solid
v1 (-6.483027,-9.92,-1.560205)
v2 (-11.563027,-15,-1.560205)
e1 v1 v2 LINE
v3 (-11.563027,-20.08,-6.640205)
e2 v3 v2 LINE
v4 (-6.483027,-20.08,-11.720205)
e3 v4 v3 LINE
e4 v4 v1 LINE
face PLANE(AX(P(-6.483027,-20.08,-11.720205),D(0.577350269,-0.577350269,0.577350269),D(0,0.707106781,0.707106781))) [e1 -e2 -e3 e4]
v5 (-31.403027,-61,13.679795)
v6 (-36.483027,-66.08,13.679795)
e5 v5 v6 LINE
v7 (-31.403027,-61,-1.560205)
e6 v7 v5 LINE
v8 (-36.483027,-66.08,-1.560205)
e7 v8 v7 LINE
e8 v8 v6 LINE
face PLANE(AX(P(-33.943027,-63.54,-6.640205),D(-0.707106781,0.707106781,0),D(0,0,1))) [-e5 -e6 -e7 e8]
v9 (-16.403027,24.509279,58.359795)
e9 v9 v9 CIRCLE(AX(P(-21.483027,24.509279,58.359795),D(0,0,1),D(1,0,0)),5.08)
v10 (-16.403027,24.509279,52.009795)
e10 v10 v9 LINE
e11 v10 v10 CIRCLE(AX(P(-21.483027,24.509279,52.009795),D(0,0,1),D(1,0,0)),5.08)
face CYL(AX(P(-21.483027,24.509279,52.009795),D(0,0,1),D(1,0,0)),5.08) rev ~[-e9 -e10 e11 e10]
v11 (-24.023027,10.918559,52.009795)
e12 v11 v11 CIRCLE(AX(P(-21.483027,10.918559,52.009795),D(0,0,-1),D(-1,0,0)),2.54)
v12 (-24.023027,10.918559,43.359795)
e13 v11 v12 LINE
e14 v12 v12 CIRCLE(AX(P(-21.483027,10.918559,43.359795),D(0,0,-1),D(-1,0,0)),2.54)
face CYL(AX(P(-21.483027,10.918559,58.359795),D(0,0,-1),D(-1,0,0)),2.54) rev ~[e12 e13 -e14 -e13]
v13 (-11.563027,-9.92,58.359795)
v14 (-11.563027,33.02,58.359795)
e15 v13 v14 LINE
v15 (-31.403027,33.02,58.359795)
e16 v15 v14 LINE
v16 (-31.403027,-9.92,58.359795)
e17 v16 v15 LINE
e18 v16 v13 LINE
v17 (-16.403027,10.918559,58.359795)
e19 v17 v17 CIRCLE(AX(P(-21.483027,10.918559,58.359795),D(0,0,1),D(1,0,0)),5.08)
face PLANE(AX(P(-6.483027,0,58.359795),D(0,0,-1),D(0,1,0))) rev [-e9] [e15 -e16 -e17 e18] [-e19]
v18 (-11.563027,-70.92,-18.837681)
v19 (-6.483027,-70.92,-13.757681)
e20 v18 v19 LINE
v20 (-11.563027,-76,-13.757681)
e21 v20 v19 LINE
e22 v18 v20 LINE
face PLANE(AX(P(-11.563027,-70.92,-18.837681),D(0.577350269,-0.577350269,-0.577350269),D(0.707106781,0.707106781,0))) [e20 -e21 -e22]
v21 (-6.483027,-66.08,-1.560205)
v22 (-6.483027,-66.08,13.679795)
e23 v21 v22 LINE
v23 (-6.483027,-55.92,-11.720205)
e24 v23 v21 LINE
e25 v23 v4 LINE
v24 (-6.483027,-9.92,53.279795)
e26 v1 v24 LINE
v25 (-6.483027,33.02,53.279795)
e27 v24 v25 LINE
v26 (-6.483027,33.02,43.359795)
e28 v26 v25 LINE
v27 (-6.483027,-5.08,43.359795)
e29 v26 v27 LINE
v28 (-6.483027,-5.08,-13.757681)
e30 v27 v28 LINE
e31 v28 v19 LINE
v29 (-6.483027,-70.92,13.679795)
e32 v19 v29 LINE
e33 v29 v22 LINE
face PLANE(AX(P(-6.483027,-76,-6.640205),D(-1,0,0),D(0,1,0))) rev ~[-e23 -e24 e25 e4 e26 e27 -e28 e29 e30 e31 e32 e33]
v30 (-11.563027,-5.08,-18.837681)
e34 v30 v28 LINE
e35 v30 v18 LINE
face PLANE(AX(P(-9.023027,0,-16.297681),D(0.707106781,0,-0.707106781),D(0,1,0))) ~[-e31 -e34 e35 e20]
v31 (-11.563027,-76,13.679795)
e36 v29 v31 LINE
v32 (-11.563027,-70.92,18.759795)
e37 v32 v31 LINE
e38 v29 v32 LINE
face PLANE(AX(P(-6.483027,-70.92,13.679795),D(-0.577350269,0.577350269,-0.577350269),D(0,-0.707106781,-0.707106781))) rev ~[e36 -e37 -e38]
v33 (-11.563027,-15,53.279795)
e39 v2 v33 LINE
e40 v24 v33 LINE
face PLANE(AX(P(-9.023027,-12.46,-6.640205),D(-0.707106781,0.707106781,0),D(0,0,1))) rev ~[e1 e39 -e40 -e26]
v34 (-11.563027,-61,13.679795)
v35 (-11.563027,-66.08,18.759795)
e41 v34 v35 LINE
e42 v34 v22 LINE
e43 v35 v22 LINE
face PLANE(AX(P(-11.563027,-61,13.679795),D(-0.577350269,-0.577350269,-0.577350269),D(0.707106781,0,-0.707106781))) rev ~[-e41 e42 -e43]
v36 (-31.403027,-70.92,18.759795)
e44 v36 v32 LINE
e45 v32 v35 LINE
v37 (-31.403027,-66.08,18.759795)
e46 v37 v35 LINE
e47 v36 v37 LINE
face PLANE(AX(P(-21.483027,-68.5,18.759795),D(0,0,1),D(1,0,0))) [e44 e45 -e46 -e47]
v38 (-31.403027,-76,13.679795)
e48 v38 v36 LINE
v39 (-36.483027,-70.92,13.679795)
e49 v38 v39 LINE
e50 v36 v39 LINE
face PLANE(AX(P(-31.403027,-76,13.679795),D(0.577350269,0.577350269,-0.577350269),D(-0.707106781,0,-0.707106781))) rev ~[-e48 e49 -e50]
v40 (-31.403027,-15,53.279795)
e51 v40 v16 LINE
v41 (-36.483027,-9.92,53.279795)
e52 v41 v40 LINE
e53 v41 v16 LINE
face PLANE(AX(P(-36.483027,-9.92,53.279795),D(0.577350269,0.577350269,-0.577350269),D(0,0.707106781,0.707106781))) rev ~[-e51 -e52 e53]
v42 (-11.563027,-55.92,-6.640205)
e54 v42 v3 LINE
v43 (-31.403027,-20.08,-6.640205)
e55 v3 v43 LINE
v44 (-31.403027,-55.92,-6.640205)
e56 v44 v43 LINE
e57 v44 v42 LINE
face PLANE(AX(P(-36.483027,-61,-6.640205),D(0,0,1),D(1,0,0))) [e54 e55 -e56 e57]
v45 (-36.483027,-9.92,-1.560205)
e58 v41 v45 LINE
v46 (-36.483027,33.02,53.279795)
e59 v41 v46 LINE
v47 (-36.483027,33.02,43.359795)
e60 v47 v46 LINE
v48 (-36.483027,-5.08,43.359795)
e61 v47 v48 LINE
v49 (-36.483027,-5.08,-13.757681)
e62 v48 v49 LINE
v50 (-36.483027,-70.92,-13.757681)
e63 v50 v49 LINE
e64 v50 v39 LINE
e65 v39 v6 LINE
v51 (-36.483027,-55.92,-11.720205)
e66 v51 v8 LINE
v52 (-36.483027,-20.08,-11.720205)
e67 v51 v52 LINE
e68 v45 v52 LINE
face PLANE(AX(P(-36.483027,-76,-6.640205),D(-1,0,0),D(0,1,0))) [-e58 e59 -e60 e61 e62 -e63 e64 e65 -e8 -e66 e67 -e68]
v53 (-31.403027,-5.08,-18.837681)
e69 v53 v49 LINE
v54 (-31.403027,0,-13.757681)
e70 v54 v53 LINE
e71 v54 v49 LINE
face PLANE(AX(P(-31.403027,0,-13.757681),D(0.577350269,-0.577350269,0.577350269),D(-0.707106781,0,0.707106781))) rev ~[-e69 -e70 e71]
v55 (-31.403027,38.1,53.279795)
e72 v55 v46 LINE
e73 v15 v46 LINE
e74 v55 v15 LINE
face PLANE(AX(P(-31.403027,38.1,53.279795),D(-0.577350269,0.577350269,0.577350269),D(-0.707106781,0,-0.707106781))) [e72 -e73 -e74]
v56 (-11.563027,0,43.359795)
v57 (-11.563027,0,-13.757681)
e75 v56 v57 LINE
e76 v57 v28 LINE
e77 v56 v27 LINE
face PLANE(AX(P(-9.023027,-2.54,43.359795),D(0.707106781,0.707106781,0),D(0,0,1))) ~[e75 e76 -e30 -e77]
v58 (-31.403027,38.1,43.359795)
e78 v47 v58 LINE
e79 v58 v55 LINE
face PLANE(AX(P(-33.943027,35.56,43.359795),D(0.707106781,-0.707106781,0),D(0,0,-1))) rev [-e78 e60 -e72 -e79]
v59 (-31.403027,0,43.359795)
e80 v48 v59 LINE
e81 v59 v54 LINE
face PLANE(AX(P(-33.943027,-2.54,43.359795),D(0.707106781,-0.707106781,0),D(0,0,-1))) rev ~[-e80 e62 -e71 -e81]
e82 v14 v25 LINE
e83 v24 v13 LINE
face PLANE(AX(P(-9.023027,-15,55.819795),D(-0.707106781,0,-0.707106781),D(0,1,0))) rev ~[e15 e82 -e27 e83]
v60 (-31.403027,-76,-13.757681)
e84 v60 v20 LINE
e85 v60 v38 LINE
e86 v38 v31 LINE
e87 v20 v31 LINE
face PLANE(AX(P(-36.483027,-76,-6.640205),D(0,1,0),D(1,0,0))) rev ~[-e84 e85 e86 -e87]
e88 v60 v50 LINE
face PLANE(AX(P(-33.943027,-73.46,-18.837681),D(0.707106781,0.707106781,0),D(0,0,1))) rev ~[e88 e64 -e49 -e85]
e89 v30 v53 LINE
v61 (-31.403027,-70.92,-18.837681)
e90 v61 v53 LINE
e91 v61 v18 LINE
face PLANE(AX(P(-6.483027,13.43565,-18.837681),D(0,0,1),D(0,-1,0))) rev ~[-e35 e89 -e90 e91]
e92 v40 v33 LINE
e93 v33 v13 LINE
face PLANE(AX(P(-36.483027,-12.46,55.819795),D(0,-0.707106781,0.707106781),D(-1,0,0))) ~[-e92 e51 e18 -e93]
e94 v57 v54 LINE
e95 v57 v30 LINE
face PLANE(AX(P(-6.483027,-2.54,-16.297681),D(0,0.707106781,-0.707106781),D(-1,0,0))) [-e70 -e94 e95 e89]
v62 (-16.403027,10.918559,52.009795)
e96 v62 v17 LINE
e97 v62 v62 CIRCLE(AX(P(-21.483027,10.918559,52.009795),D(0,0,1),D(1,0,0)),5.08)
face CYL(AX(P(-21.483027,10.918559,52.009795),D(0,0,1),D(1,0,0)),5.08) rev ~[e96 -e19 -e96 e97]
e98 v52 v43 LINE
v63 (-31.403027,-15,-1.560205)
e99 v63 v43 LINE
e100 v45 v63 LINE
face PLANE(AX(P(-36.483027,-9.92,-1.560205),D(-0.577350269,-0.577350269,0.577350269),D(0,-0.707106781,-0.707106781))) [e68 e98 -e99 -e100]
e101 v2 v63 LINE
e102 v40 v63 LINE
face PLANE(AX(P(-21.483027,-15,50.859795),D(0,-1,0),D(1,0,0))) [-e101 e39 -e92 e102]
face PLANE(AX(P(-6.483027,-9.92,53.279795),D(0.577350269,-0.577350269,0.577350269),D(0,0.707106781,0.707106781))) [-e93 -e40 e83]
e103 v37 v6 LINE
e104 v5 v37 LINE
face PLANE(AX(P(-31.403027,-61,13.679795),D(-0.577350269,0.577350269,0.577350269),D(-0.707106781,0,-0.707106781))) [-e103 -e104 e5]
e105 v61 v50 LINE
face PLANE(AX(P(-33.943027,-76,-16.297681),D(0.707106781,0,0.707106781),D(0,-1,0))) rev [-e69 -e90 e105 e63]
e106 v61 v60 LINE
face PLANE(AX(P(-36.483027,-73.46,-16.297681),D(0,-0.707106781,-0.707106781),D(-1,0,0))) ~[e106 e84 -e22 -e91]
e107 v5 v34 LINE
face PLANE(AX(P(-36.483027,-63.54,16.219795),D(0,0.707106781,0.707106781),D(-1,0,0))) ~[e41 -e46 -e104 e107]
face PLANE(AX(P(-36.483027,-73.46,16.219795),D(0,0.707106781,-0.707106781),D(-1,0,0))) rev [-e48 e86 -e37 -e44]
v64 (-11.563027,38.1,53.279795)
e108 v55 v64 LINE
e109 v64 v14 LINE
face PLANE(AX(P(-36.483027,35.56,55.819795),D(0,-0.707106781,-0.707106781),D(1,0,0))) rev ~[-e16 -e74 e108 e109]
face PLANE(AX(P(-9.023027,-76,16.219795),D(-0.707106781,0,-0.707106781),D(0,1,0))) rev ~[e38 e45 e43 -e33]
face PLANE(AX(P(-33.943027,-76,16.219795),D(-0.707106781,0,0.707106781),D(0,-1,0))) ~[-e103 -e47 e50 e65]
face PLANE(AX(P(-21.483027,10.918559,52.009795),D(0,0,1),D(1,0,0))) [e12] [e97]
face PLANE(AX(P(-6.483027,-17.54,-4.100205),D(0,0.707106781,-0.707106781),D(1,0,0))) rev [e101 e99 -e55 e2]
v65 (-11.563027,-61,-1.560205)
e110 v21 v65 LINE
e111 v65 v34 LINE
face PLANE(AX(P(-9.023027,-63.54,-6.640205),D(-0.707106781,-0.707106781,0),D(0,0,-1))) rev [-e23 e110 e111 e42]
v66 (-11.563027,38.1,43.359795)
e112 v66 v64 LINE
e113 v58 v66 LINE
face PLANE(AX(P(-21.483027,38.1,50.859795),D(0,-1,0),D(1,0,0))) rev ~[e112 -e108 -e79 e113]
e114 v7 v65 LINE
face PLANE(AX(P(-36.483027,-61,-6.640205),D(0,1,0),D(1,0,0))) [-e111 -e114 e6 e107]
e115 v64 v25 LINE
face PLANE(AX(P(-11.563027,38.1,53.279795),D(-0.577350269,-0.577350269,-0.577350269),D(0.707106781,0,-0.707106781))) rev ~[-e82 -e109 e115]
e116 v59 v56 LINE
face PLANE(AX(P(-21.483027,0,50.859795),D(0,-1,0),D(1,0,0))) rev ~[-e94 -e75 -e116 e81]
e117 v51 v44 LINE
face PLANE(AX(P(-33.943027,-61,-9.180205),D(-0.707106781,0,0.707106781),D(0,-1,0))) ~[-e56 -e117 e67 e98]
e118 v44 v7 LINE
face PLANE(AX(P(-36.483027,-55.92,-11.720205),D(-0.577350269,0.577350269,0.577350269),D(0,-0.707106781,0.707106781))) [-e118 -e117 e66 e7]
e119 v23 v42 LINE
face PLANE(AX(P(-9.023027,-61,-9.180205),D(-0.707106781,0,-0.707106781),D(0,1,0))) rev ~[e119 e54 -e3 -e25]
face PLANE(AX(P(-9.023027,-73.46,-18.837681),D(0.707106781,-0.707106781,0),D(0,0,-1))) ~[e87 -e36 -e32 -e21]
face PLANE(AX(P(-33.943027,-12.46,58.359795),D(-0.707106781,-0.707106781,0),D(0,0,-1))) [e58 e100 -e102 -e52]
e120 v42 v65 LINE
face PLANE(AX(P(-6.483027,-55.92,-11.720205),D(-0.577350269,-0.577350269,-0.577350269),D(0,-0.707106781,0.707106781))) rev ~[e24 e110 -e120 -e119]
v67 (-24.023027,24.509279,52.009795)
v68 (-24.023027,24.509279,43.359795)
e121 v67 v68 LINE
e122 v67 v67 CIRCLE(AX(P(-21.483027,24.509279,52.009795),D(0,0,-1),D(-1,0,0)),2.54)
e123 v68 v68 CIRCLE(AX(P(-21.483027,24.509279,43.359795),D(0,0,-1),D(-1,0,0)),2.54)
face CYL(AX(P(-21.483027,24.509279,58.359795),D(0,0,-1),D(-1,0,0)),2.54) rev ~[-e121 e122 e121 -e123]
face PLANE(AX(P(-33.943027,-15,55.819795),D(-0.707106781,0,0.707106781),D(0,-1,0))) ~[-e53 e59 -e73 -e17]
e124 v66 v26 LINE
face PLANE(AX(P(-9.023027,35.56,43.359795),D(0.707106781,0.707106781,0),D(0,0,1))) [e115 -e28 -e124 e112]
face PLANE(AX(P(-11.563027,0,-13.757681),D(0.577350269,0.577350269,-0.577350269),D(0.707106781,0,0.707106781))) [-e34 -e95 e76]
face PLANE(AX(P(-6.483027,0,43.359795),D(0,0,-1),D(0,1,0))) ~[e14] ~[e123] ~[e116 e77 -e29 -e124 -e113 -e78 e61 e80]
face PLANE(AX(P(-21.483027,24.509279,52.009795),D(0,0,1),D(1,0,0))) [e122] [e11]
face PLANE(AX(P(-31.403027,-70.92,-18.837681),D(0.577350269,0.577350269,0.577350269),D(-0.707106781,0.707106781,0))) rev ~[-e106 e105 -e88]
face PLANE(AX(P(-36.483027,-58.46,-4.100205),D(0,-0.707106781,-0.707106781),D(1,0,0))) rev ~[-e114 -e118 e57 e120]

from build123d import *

# Parameters (mm, degrees)
F0_W            = 30
F0_H            = 15
F0_H_2          = 50
F0_H_3          = 25.4
F1_DEPTH        = 15
F2_DEPTH        = 38.1
F5_W            = 38.1
F5_H            = 15
F6_ANGLE        = 60
F7_DEPTH        = 61
F8_DEPTH        = 15
F9_W            = 30
F9_H            = 15
F10_DEPTH       = 25.4
F12_DEPTH       = 26.924
F14_D           = 5.08
F14_CBORE_D     = 10.16
F14_CBORE_DEPTH = 6.35
F15_D           = 5.08
F15_CBORE_D     = 10.16
F15_CBORE_DEPTH = 6.35
F17_DEPTH       = 60.96
F18_DEPTH       = 45.212
F19_SIZE        = 5.08


# Not quite as in the source:
# - a feature of the source that left no trace in its solid (it failed there, or was rolled back) is left out


with BuildPart() as f1:
    # F0 (on Front) → F1 (new body)
    with BuildSketch(Plane.XZ):
        with Locations((-21.4830274055, 50.8597951472)):
            Rectangle(F0_W, F0_H)
        with Locations((-21.4830274055, 18.3597951472)):
            Rectangle(F0_W, F0_H_2)
        with Locations((-21.4830274055, -19.3402048528)):
            Rectangle(F0_W, F0_H_3)
    extrude(amount=F1_DEPTH)

    # F0 (on Front) → F2 (join)
    with BuildSketch(Plane.XZ):
        with Locations((-21.4830274055, 50.8597951472)):
            Rectangle(F0_W, F0_H)
    extrude(amount=-F2_DEPTH)

    # F5 (on face) → F6 (revolve)
    with BuildSketch(Plane.YZ.offset(-6.4830274055)):
        with Locations((19.05, 50.8597951472)):
            Rectangle(F5_W, F5_H)
    revolve(axis=Axis((-6.4830274055, 0, 50.8597951472), (0, 0, -1)), revolution_arc=F6_ANGLE)

    # F0 (on Front) → F7 (join)
    with BuildSketch(Plane.XZ):
        with Locations((-21.4830274055, -19.3402048528)):
            Rectangle(F0_W, F0_H_3)
    extrude(amount=F7_DEPTH)

    # F8 (add): a face of the model
    f8_faces = [f1.faces().sort_by_distance(p)[0] for p in [
        (-21.4830274055, -61, -19.3402048528),
    ]]
    extrude(f8_faces, amount=F8_DEPTH)

    # F9 (on face) → F10 (join)
    with BuildSketch(Plane.XY.offset(-6.6402048528)):
        with Locations((-21.4830274055, -68.5)):
            Rectangle(F9_W, F9_H)
    extrude(amount=F10_DEPTH)

    # F11 (on face) → F12 (cut)
    with BuildSketch(Plane.XY.offset(58.3597951472)):
        with BuildLine():
            Line((-6.4830274055, 38.1), (-6.4830274055, 0))
            Line((-6.4830274055, 0), (26.5125404787, 19.05))
            ThreePointArc((26.5125404787, 19.05), (12.5669725945, 32.9955678842), (-6.4830274055, 38.1))
        make_face()
    extrude(amount=-F12_DEPTH, mode=Mode.SUBTRACT)

    # F14 (through all)
    with Locations(Plane.XY.offset(58.3597951472)):
        with Locations((-21.4830274055, 24.5092792876)):
            CounterBoreHole(F14_D / 2, F14_CBORE_D / 2, F14_CBORE_DEPTH)

    # F15 (through all)
    with Locations(Plane.XY.offset(58.3597951472)):
        with Locations((-21.4830274055, 10.9185585752)):
            CounterBoreHole(F15_D / 2, F15_CBORE_D / 2, F15_CBORE_DEPTH)

    # F16 (on face) → F17 (cut)
    with BuildSketch(Plane.YZ.offset(-6.4830274055)):
        Polygon((0, -18.8376810402), (-69.65, -18.8376810402), (-76, -18.8376810402), (-76, -32.0402048528), (0, -32.0402048528), align=None)
        Polygon((13.4356496856, -18.8376810402), (0, -18.8376810402), (0, -32.0402048528), (-76, -32.0402048528), (-76, -18.8376810402), (-82.0414423943, -18.8376810402), (-82.0414423943, -58.5641600192), (13.4356496856, -58.5641600192), align=None)
    extrude(amount=-F17_DEPTH, mode=Mode.SUBTRACT)

    # F16 (on face) → F18 (cut)
    with BuildSketch(Plane.YZ.offset(-6.4830274055)):
        Polygon((13.4356496856, -18.8376810402), (0, -18.8376810402), (0, -32.0402048528), (-76, -32.0402048528), (-76, -18.8376810402), (-82.0414423943, -18.8376810402), (-82.0414423943, -58.5641600192), (13.4356496856, -58.5641600192), align=None)
        Polygon((0, -18.8376810402), (-69.65, -18.8376810402), (-76, -18.8376810402), (-76, -32.0402048528), (0, -32.0402048528), align=None)
    extrude(amount=-F18_DEPTH, mode=Mode.SUBTRACT)

    # F19
    f19_edges = [f1.edges().sort_by_distance(p)[0] for p in [
        (-6.483027, -38, -6.640205),
        (-36.483027, -38, -6.640205),
        (-36.483027, -68.5, 18.759795),
        (-21.483027, -76, 18.759795),
        (-6.483027, -68.5, 18.759795),
        (-21.483027, -61, 18.759795),
        (-36.483027, -76, -0.038943),
        (-6.483027, -76, -0.038943),
        (-21.483027, -76, -18.837681),
        (-6.483027, -38, -18.837681),
        (-36.483027, -38, -18.837681),
        (-21.483027, 0, -18.837681),
        (-21.483027, -15, 58.359795),
        (-6.483027, -15, 25.859795),
        (-21.483027, -15, -6.640205),
        (-36.483027, -15, 25.859795),
        (-6.483027, -61, 6.059795),
        (-36.483027, -61, 6.059795),
        (-21.483027, -61, -6.640205),
        (-6.483027, 11.55, 58.359795),
        (-36.483027, 11.55, 58.359795),
        (-21.483027, 38.1, 58.359795),
        (-6.483027, 0, 12.261057),
        (-36.483027, 0, 12.261057),
        (-6.483027, 38.1, 50.859795),
        (-36.483027, 38.1, 50.859795),
    ]]
    chamfer(f19_edges, length=F19_SIZE)


solid = f1.part
